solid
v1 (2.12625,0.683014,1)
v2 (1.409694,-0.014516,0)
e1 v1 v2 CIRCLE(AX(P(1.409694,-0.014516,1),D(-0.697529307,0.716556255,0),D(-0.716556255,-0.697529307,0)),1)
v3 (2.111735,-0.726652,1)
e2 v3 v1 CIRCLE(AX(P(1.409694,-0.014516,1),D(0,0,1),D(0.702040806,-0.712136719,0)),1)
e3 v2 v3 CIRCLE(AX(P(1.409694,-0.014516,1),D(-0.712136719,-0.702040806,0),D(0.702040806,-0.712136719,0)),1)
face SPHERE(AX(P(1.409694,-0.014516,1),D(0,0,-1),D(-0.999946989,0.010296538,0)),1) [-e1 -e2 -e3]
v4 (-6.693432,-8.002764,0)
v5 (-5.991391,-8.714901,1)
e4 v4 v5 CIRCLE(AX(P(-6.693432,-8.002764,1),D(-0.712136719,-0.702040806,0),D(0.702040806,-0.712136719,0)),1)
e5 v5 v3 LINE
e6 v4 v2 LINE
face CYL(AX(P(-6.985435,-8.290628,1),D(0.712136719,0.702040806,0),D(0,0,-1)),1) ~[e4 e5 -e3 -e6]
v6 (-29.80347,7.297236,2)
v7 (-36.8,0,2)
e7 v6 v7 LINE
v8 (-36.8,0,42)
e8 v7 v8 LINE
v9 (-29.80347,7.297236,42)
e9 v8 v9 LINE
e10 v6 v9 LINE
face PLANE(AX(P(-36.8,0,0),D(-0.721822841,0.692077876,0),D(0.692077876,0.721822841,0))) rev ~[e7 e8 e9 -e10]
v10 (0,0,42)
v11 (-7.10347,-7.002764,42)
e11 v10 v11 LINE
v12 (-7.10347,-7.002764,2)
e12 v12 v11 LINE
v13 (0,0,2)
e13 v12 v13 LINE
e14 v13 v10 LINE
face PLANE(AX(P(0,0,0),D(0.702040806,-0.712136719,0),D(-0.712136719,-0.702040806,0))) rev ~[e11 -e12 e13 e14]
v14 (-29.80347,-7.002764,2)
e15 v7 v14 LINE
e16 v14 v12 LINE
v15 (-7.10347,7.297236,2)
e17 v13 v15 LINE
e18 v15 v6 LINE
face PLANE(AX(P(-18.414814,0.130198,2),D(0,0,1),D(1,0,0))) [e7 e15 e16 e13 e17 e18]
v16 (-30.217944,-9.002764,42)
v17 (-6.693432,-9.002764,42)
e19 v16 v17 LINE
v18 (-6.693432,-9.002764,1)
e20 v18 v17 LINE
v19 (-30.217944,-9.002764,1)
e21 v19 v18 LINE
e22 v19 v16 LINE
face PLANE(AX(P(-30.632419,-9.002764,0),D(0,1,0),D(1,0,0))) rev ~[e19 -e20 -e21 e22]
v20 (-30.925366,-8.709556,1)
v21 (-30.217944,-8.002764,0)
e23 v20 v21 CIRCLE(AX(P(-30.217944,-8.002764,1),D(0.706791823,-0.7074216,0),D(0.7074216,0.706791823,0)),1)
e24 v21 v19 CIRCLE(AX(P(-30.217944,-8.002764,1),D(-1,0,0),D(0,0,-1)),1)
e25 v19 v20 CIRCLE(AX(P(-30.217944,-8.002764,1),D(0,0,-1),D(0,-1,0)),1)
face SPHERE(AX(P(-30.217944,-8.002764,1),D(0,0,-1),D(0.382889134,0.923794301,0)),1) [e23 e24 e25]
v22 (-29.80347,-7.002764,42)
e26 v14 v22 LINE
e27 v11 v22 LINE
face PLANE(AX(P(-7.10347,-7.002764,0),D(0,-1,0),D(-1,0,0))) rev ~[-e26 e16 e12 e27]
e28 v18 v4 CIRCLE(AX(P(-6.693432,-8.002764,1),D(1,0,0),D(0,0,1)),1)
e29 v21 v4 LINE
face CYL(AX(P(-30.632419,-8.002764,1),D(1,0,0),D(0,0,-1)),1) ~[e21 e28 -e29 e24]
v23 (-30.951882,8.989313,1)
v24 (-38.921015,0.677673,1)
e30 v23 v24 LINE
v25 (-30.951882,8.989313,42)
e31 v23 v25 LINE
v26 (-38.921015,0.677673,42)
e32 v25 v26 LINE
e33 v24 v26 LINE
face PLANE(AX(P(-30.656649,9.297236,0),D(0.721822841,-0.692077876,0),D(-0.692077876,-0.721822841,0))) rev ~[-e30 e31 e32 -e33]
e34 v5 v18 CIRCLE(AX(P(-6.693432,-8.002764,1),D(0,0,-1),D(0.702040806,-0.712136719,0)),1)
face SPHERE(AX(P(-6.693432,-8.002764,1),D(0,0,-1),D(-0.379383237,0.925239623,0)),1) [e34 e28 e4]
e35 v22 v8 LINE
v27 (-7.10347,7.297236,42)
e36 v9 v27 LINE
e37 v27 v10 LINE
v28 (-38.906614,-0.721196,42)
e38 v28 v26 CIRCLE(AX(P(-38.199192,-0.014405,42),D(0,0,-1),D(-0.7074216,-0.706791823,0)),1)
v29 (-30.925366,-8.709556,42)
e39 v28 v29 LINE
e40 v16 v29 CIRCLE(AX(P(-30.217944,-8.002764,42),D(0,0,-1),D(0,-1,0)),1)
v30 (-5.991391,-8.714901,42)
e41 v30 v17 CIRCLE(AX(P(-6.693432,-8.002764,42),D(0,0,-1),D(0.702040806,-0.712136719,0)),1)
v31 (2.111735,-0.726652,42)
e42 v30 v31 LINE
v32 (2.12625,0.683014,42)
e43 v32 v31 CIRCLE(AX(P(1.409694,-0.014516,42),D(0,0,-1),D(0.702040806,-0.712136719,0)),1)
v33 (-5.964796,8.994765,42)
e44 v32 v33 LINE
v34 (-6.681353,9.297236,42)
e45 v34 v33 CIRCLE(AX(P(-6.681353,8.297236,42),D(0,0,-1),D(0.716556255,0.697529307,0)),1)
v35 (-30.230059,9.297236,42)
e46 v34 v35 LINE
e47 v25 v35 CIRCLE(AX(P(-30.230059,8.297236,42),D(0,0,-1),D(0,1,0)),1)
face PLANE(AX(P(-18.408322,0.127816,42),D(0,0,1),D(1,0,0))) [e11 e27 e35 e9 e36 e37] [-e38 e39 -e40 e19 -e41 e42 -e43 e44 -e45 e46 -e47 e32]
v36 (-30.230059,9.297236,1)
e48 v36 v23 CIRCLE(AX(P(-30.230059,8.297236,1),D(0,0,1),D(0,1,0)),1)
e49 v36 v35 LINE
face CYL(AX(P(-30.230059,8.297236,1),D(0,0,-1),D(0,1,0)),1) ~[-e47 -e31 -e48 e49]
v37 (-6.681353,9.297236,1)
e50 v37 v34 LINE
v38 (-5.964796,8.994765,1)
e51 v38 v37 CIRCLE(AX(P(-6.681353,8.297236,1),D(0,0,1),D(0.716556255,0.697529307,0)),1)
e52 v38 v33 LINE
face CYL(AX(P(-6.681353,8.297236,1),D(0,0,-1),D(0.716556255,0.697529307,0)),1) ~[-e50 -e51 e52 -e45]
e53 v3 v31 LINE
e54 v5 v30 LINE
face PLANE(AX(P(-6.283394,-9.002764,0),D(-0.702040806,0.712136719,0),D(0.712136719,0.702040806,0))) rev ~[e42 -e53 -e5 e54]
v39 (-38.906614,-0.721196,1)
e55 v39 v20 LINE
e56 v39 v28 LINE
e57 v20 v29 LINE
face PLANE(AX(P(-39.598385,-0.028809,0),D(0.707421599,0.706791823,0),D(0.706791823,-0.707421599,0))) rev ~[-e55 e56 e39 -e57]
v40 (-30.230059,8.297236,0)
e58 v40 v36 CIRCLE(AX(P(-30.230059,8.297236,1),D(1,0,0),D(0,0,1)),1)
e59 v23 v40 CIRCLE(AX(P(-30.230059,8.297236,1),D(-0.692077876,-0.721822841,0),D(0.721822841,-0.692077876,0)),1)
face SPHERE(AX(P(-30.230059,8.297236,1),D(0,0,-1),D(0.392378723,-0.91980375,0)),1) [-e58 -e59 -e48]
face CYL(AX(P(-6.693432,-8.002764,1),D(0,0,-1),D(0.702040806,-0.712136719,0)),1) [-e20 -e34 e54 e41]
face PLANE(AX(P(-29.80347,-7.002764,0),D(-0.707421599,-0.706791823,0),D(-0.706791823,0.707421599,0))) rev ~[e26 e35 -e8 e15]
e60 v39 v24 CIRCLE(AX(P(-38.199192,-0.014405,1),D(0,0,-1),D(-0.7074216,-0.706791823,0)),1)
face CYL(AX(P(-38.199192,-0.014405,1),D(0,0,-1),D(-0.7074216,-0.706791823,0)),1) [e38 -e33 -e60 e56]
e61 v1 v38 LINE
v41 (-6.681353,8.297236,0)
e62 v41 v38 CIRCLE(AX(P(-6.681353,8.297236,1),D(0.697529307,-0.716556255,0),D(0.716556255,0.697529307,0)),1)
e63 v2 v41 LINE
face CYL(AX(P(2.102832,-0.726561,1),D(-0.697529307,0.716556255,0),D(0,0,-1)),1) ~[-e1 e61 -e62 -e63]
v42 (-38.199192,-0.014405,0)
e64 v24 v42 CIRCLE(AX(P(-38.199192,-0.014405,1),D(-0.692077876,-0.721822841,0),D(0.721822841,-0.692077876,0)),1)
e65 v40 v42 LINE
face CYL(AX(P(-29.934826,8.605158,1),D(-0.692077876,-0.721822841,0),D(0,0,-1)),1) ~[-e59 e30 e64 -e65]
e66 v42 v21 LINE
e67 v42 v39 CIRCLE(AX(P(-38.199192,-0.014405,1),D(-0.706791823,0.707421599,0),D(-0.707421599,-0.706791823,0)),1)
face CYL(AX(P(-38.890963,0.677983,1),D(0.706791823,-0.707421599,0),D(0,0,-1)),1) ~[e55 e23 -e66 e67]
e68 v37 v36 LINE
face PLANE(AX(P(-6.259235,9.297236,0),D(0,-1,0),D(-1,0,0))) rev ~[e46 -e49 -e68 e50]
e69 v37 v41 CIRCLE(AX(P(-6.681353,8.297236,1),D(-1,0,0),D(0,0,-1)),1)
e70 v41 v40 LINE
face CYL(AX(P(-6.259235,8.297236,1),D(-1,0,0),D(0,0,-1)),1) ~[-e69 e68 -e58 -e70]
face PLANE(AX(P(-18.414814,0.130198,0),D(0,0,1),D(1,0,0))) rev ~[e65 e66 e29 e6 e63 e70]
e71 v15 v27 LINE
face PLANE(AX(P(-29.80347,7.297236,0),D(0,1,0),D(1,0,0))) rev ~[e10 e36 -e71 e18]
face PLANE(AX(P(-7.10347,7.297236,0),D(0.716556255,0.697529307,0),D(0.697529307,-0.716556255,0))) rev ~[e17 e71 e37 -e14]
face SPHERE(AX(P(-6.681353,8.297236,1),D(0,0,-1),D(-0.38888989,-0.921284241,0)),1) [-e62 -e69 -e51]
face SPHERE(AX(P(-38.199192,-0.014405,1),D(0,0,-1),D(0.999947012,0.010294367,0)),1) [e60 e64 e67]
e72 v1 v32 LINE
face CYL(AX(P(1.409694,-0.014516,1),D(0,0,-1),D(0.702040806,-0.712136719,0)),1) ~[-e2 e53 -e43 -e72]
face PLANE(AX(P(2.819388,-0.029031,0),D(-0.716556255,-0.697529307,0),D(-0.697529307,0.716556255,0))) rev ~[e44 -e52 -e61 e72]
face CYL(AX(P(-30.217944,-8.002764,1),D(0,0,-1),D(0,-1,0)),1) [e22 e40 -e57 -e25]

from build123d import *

# Parameters (mm, degrees)
F1_DEPTH     = 42
F2_DEPTH     = 2
F3_R         = 1
F4_T1_DEPTH  = 43.446869231
F4_T3_DEPTH  = 42.0361861213
F4_T5_DEPTH  = 42.0250945478
F4_T7_DEPTH  = 43.4842607953
F4_T9_DEPTH  = 42.0552929075
F4_T11_DEPTH = 42.0664740253
F4_T16_DEPTH = 1
F4_T22_DEPTH = 1
F4_T28_DEPTH = 1
F4_T34_DEPTH = 1
F4_T40_DEPTH = 1
F4_T46_DEPTH = 1


# Not quite as in the source:
# - a fillet or chamfer that OpenCascade refuses, or shapes differently, is made with other operations: its cross-section is extruded or revolved along the edge and cut away or added


with BuildPart() as f1:
    # F0 (on Top) → F1 (new body)
    with BuildSketch(Plane.XY):
        Polygon((-6.2833941388, -9.0027643815), (2.8193882778, -0.0290314764), (-6.2592354511, 9.2972356185), (-30.6566489974, 9.2972356185), (-39.5983849299, -0.0288091293), (-30.6324186742, -9.0027643815), align=None)
        Polygon((-7.1034697771, 7.2972356185), (0, 0), (-7.1034697771, -7.0027643815), (-29.8034697771, -7.0027643815), (-36.8, 0), (-29.8034697771, 7.2972356185), align=None, mode=Mode.SUBTRACT)
    extrude(amount=F1_DEPTH)

    # F0 (on Top) → F2 (join)
    with BuildSketch(Plane.XY):
        Polygon((-7.1034697771, -7.0027643815), (0, 0), (-7.1034697771, 7.2972356185), (-29.8034697771, 7.2972356185), (-36.8, 0), (-29.8034697771, -7.0027643815), align=None)
    extrude(amount=F2_DEPTH)

    # F3
    f3_edges = [f1.edges().sort_by_distance(p)[0] for p in [
        (-1.719924, 4.634102, 0),
        (-18.457942, 9.297236, 0),
        (-35.127517, 4.634213, 0),
        (-35.115402, -4.515787, 0),
        (-18.457906, -9.002764, 0),
        (-1.732003, -4.515898, 0),
    ]]
    fillet(f3_edges, radius=F3_R)

    # F4: fillet of radius 1 on 6 edges, made by hand

    # F4_s2 → F4_t1 (cut)
    with BuildSketch(Plane.XY.offset(1)):
        with BuildLine():
            ThreePointArc((-38.9066140644, -0.7211963873), (-39.1991394765, -0.0246989321), (-38.9210153062, 0.6776733109))
            Line((-38.9210153062, 0.6776733109), (-39.5983849299, -0.0288091293))
            Line((-39.5983849299, -0.0288091293), (-38.9066140644, -0.7211963873))
        make_face()
    extrude(amount=F4_T1_DEPTH, mode=Mode.SUBTRACT)

    # F4_s4 → F4_t3 (cut)
    with BuildSketch(Plane.XY.offset(1)):
        with BuildLine():
            ThreePointArc((-30.2179442256, -9.0027643815), (-30.6008333593, -8.9265586829), (-30.9253658251, -8.7095562041))
            Line((-30.9253658251, -8.7095562041), (-30.6324186742, -9.0027643815))
            Line((-30.6324186742, -9.0027643815), (-30.2179442256, -9.0027643815))
        make_face()
    extrude(amount=F4_T3_DEPTH, mode=Mode.SUBTRACT)

    # F4_s6 → F4_t5 (cut)
    with BuildSketch(Plane.XY.offset(1)):
        with BuildLine():
            ThreePointArc((-5.9913911517, -8.7149011003), (-6.3140487209, -8.9280040042), (-6.693431958, -9.0027643815))
            Line((-6.693431958, -9.0027643815), (-6.2833941388, -9.0027643815))
            Line((-6.2833941388, -9.0027643815), (-5.9913911517, -8.7149011003))
        make_face()
    extrude(amount=F4_T5_DEPTH, mode=Mode.SUBTRACT)

    # F4_s8 → F4_t7 (cut)
    with BuildSketch(Plane.XY.offset(1)):
        with BuildLine():
            ThreePointArc((2.1117349451, -0.726652457), (2.4096411281, -0.0248122758), (2.1262503938, 0.6830135684))
            Line((2.1262503938, 0.6830135684), (2.8193882778, -0.0290314764))
            Line((2.8193882778, -0.0290314764), (2.1117349451, -0.726652457))
        make_face()
    extrude(amount=F4_T7_DEPTH, mode=Mode.SUBTRACT)

    # F4_s10 → F4_t9 (cut)
    with BuildSketch(Plane.XY.offset(1)):
        with BuildLine():
            ThreePointArc((-5.9647963592, 8.9947649251), (-6.2924627239, 9.2185198598), (-6.6813526141, 9.2972356185))
            Line((-6.6813526141, 9.2972356185), (-6.2592354511, 9.2972356185))
            Line((-6.2592354511, 9.2972356185), (-5.9647963592, 8.9947649251))
        make_face()
    extrude(amount=F4_T9_DEPTH, mode=Mode.SUBTRACT)

    # F4_s12 → F4_t11 (cut)
    with BuildSketch(Plane.XY.offset(1)):
        with BuildLine():
            ThreePointArc((-30.2300593872, 9.2972356185), (-30.6224381102, 9.2170393681), (-30.9518822285, 8.9893134941))
            Line((-30.9518822285, 8.9893134941), (-30.6566489974, 9.2972356185))
            Line((-30.6566489974, 9.2972356185), (-30.2300593872, 9.2972356185))
        make_face()
    extrude(amount=F4_T11_DEPTH, mode=Mode.SUBTRACT)


with BuildPart() as f4_tool14:
    # F4_s15 → F4_t16 (new body)
    with BuildSketch(Plane.XY.offset(1)):
        Polygon((-30.2300593872, 8.2972356185), (-30.2300593872, 9.2972356185), (-30.6566489974, 9.2972356185), (-30.9518822285, 8.9893134941), align=None)
    extrude(amount=-F4_T16_DEPTH)

    # F4_s17 → F4_t18 (revolve, cut)
    with BuildSketch(Plane(origin=(-30.2300593872, 8.2972356185, 1), x_dir=(0.3923787229, -0.9198037496, 0), z_dir=(0.9198037496, 0.3923787229, 0))):
        with BuildLine():
            ThreePointArc((0, -1), (1, 0), (0, 1))
            Line((0, 1), (0, -1))
        make_face()
    revolve(axis=Axis((-30.2300593872, 8.2972356185, 1), (0, 0, -1)), mode=Mode.SUBTRACT)


with BuildPart() as f1_1:
    add(f1.part)

    # F4_t13: cut F4_tool14
    add(f4_tool14.part, mode=Mode.SUBTRACT)


with BuildPart() as f4_tool20:
    # F4_s21 → F4_t22 (new body)
    with BuildSketch(Plane.XY.offset(1)):
        Polygon((-6.6813526141, 8.2972356185), (-5.9647963592, 8.9947649251), (-6.2592354511, 9.2972356185), (-6.6813526141, 9.2972356185), align=None)
    extrude(amount=-F4_T22_DEPTH)

    # F4_s23 → F4_t24 (revolve, cut)
    with BuildSketch(Plane(origin=(-6.6813526141, 8.2972356185, 1), x_dir=(-0.3888898902, -0.9212842413, 0), z_dir=(0.9212842413, -0.3888898902, 0))):
        with BuildLine():
            ThreePointArc((0, -1), (1, 0), (0, 1))
            Line((0, 1), (0, -1))
        make_face()
    revolve(axis=Axis((-6.6813526141, 8.2972356185, 1), (0, 0, -1)), mode=Mode.SUBTRACT)


with BuildPart() as f1_2:
    add(f1_1.part)

    # F4_t19: cut F4_tool20
    add(f4_tool20.part, mode=Mode.SUBTRACT)


with BuildPart() as f4_tool26:
    # F4_s27 → F4_t28 (new body)
    with BuildSketch(Plane.XY.offset(1)):
        Polygon((1.4096941389, -0.0145157382), (2.1117349451, -0.726652457), (2.8193882778, -0.0290314764), (2.1262503938, 0.6830135684), align=None)
    extrude(amount=-F4_T28_DEPTH)

    # F4_s29 → F4_t30 (revolve, cut)
    with BuildSketch(Plane(origin=(1.4096941389, -0.0145157382, 1), x_dir=(-0.9999469893, 0.0102965376, 0), z_dir=(-0.0102965376, -0.9999469893, 0))):
        with BuildLine():
            ThreePointArc((0, -1), (1, 0), (0, 1))
            Line((0, 1), (0, -1))
        make_face()
    revolve(axis=Axis((1.4096941389, -0.0145157382, 1), (0, 0, -1)), mode=Mode.SUBTRACT)


with BuildPart() as f1_3:
    add(f1_2.part)

    # F4_t25: cut F4_tool26
    add(f4_tool26.part, mode=Mode.SUBTRACT)


with BuildPart() as f4_tool32:
    # F4_s33 → F4_t34 (new body)
    with BuildSketch(Plane.XY.offset(1)):
        Polygon((-6.693431958, -8.0027643815), (-5.9913911517, -8.7149011003), (-6.2833941388, -9.0027643815), (-6.693431958, -9.0027643815), align=None)
    extrude(amount=-F4_T34_DEPTH)

    # F4_s35 → F4_t36 (revolve, cut)
    with BuildSketch(Plane(origin=(-6.693431958, -8.0027643815, 1), x_dir=(-0.3793832371, 0.9252396227, 0), z_dir=(-0.9252396227, -0.3793832371, 0))):
        with BuildLine():
            ThreePointArc((0, -1), (1, 0), (0, 1))
            Line((0, 1), (0, -1))
        make_face()
    revolve(axis=Axis((-6.693431958, -8.0027643815, 1), (0, 0, -1)), mode=Mode.SUBTRACT)


with BuildPart() as f1_4:
    add(f1_3.part)

    # F4_t31: cut F4_tool32
    add(f4_tool32.part, mode=Mode.SUBTRACT)


with BuildPart() as f4_tool38:
    # F4_s39 → F4_t40 (new body)
    with BuildSketch(Plane.XY.offset(1)):
        Polygon((-30.2179442256, -8.0027643815), (-30.2179442256, -9.0027643815), (-30.6324186742, -9.0027643815), (-30.9253658251, -8.7095562041), align=None)
    extrude(amount=-F4_T40_DEPTH)

    # F4_s41 → F4_t42 (revolve, cut)
    with BuildSketch(Plane(origin=(-30.2179442256, -8.0027643815, 1), x_dir=(0.3828891336, 0.9237943014, 0), z_dir=(-0.9237943014, 0.3828891336, 0))):
        with BuildLine():
            ThreePointArc((0, -1), (1, 0), (0, 1))
            Line((0, 1), (0, -1))
        make_face()
    revolve(axis=Axis((-30.2179442256, -8.0027643815, 1), (0, 0, -1)), mode=Mode.SUBTRACT)


with BuildPart() as f1_5:
    add(f1_4.part)

    # F4_t37: cut F4_tool38
    add(f4_tool38.part, mode=Mode.SUBTRACT)


with BuildPart() as f4_tool44:
    # F4_s45 → F4_t46 (new body)
    with BuildSketch(Plane.XY.offset(1)):
        Polygon((-38.1991924649, -0.0144045646), (-38.9066140644, -0.7211963873), (-39.5983849299, -0.0288091293), (-38.9210153062, 0.6776733109), align=None)
    extrude(amount=-F4_T46_DEPTH)

    # F4_s47 → F4_t48 (revolve, cut)
    with BuildSketch(Plane(origin=(-38.1991924649, -0.0144045646, 1), x_dir=(0.9999470116, 0.0102943674, 0), z_dir=(-0.0102943674, 0.9999470116, 0))):
        with BuildLine():
            ThreePointArc((0, -1), (1, 0), (0, 1))
            Line((0, 1), (0, -1))
        make_face()
    revolve(axis=Axis((-38.1991924649, -0.0144045646, 1), (0, 0, -1)), mode=Mode.SUBTRACT)


with BuildPart() as f1_6:
    add(f1_5.part)

    # F4_t43: cut F4_tool44
    add(f4_tool44.part, mode=Mode.SUBTRACT)


solid = f1_6.part
